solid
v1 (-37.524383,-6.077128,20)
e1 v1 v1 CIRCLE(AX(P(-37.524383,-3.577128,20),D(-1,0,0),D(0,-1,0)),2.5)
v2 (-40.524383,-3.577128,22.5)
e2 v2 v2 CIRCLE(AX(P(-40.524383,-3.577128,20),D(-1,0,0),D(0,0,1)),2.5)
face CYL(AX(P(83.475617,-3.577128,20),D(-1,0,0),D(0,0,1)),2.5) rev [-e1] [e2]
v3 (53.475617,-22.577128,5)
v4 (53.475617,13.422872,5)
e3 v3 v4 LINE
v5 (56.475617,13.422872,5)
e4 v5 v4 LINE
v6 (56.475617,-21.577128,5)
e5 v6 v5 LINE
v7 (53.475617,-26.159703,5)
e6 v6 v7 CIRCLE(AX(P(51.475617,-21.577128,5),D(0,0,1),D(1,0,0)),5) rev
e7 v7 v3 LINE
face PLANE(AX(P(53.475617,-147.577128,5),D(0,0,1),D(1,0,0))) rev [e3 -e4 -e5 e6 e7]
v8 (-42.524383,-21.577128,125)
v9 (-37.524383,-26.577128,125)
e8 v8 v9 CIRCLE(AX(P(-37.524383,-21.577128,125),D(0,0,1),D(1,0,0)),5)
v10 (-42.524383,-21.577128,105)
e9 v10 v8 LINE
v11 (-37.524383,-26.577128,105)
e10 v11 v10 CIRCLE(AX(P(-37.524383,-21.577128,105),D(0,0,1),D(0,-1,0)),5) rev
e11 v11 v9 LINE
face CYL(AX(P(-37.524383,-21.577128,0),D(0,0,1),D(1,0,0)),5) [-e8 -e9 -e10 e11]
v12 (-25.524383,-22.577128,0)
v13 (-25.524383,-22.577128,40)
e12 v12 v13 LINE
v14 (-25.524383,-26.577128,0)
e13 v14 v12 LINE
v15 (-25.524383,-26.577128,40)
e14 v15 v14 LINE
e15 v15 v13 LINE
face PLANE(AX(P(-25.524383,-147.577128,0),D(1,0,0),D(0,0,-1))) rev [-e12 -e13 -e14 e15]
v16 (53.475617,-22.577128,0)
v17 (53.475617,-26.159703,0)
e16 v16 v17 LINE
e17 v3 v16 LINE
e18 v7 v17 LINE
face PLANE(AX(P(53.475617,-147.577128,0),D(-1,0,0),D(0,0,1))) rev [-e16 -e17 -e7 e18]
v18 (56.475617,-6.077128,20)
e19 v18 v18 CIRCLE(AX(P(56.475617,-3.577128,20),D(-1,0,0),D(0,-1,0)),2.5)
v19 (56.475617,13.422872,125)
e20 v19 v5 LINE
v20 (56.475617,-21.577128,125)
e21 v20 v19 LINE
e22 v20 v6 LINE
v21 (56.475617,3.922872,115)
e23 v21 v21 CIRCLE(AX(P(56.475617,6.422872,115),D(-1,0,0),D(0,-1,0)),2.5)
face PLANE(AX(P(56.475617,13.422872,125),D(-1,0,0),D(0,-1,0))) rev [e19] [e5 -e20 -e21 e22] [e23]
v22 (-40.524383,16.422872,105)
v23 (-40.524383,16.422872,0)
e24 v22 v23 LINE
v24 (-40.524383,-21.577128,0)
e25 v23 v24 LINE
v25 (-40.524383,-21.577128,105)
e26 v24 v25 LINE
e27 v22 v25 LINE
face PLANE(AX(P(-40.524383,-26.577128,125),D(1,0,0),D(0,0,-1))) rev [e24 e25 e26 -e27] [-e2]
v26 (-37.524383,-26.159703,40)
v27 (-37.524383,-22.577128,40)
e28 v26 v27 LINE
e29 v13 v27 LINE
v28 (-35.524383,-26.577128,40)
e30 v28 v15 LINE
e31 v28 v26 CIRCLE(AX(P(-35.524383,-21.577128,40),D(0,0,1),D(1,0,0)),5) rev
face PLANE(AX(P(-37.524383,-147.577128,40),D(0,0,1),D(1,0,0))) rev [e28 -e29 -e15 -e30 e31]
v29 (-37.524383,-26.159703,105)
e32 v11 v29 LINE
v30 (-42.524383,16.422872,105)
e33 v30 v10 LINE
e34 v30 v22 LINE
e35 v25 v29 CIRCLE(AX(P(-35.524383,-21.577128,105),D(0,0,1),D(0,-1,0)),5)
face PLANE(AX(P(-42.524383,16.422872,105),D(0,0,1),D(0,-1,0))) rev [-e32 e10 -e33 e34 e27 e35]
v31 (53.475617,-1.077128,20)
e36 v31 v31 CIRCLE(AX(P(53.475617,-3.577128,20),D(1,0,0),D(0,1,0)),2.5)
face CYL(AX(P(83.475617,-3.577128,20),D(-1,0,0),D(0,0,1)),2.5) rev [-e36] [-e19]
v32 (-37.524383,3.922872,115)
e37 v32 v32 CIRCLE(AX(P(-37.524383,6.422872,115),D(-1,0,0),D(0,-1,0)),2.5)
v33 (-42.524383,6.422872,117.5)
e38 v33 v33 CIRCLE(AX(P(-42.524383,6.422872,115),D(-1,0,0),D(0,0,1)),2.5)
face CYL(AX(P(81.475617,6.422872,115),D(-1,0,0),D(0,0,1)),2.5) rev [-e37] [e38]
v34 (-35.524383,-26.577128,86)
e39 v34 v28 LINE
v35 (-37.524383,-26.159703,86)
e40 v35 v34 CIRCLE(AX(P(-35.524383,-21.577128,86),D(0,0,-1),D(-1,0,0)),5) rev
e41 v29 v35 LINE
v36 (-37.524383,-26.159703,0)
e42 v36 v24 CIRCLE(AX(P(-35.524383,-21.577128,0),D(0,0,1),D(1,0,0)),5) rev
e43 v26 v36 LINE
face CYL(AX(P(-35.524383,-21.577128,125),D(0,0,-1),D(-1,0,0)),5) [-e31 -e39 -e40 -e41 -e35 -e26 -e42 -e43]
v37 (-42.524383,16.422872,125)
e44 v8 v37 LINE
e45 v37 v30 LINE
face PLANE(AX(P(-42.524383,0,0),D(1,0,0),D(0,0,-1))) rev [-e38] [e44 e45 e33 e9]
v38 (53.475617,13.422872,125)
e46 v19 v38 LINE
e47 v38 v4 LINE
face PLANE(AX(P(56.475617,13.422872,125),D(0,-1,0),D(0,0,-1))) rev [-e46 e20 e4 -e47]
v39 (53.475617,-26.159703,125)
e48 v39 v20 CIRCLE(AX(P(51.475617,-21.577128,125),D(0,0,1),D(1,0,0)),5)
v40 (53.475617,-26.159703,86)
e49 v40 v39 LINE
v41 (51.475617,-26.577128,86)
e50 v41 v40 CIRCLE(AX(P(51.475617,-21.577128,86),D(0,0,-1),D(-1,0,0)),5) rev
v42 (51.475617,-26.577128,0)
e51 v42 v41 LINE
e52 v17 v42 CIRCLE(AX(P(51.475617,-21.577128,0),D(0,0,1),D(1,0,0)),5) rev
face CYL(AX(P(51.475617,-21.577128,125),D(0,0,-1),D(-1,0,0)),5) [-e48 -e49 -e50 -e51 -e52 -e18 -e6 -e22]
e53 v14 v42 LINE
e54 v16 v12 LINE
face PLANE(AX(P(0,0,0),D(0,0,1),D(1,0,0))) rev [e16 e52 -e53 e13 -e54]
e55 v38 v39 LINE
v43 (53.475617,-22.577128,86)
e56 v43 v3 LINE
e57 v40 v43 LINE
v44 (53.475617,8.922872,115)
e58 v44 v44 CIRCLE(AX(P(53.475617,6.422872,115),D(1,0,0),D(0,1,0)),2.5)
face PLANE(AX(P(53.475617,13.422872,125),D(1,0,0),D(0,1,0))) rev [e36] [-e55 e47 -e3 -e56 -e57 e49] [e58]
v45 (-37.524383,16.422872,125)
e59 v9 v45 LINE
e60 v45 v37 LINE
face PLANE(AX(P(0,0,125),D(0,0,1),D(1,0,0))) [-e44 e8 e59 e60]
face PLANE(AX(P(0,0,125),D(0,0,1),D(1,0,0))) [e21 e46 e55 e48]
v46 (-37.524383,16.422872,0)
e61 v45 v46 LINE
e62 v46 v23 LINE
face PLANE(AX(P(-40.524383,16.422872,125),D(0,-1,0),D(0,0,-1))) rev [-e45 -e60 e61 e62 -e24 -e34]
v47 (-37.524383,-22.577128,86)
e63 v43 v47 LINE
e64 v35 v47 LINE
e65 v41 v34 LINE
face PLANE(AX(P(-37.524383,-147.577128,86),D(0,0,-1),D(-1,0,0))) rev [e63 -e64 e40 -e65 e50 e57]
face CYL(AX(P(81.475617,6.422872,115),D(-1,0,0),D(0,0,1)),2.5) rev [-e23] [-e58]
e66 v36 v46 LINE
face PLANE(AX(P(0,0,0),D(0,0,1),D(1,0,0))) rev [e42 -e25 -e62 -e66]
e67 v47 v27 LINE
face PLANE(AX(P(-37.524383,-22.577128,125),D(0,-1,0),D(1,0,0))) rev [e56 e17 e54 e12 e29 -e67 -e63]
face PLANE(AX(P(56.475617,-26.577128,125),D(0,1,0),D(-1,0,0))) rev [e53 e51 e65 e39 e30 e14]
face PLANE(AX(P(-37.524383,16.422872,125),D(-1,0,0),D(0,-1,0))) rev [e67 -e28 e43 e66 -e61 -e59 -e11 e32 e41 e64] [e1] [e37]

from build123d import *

# Parameters (mm, degrees)
SALIENTE_EXTRUIR1_DEPTH    = 125
CORTAR_EXTRUIR1_DEPTH      = 125
CORTAR_EXTRUIR1_DEPTH_BACK = 125
CROQUIS3_W                 = 4
CROQUIS3_H                 = 5
CROQUIS3_W_2               = 12
CROQUIS3_H_2               = 40
CROQUIS4_W                 = 91
CROQUIS4_H                 = 39
CORTAR_EXTRUIR2_DEPTH      = 125
CROQUIS5_W                 = 20
CROQUIS5_H                 = 43
SALIENTE_EXTRUIR2_DEPTH    = 2
CROQUIS6_R                 = 2.5
CORTAR_EXTRUIR3_DEPTH      = 124
CROQUIS7_R                 = 2.5
CORTAR_EXTRUIR4_DEPTH      = 124
REDONDEO1_R                = 5
REDONDEO2_R                = 5


# Some blends are built 0.0001 mm under size
with BuildPart() as part:
    # Croquis2 → Saliente-Extruir1 (new body)
    with BuildSketch(Plane.XY):
        Polygon((56.475617161, 13.42287234), (56.475617161, -26.57712766), (-40.524382839, -26.57712766), (-40.524382839, 16.42287234), (-37.524382839, 16.42287234), (-37.524382839, -22.57712766), (53.475617161, -22.57712766), (53.475617161, 13.42287234), align=None)
    extrude(amount=SALIENTE_EXTRUIR1_DEPTH)

    # Croquis3 → Cortar-Extruir1 (cut, two sides: drawn at the far end of the back side and taken through both)
    with BuildSketch(Plane(origin=(0, -22.57712766, 0), x_dir=(1, 0, 0), z_dir=(0, 1, 0)).offset(-CORTAR_EXTRUIR1_DEPTH_BACK)):
        with Locations((55.475617161, -2.5)):
            Rectangle(CROQUIS3_W, CROQUIS3_H)
        with Locations((-31.524382839, -20)):
            Rectangle(CROQUIS3_W_2, CROQUIS3_H_2)
    extrude(amount=CORTAR_EXTRUIR1_DEPTH + CORTAR_EXTRUIR1_DEPTH_BACK, mode=Mode.SUBTRACT)

    # Croquis4 → Cortar-Extruir2 (cut)
    with BuildSketch(Plane(origin=(0, -22.57712766, 0), x_dir=(1, 0, 0), z_dir=(0, 1, 0))):
        with Locations((7.975617161, -105.5)):
            Rectangle(CROQUIS4_W, CROQUIS4_H)
    extrude(amount=-CORTAR_EXTRUIR2_DEPTH, mode=Mode.SUBTRACT)

    # Croquis5 → Saliente-Extruir2 (add)
    with BuildSketch(Plane.ZY.offset(40.524382839)):
        with Locations((115, -5.07712766)):
            Rectangle(CROQUIS5_W, CROQUIS5_H)
    extrude(amount=SALIENTE_EXTRUIR2_DEPTH)

    # Croquis6 → Cortar-Extruir3 (cut)
    with BuildSketch(Plane.ZY.offset(40.524382839)):
        with Locations(Location((20, -3.57712766, 0), (0, 0, 270))):
            Circle(CROQUIS6_R)
    extrude(amount=-CORTAR_EXTRUIR3_DEPTH, mode=Mode.SUBTRACT)

    # Croquis7 → Cortar-Extruir4 (cut)
    with BuildSketch(Plane.ZY.offset(42.524382839)):
        with Locations((115, 6.42287234)):
            Circle(CROQUIS7_R)
    extrude(amount=-CORTAR_EXTRUIR4_DEPTH, mode=Mode.SUBTRACT)

    # Redondeo1
    # the kernel refuses this fillet: 5 mm, written as the material it takes off along each edge
    with BuildSketch(Plane(origin=(56.475617161, -26.57712766, -7.5), x_dir=(0, 1, 0), z_dir=(0, 0, 1))) as redondeo1_piece_1:
        with BuildLine():
            CenterArc((REDONDEO1_R, REDONDEO1_R), REDONDEO1_R, 180, 90)
            Line((0, REDONDEO1_R), (0, 0))
            Line((0, 0), (REDONDEO1_R, 0))
        make_face()
    extrude(amount=145, mode=Mode.SUBTRACT)
    with BuildSketch(Plane(origin=(-40.524382839, -26.57712766, -12.5), x_dir=(1, 0, 0), z_dir=(0, 0, 1))) as redondeo1_piece_2:
        with BuildLine():
            CenterArc((REDONDEO1_R, REDONDEO1_R), REDONDEO1_R, 180, 90)
            Line((0, REDONDEO1_R), (0, 0))
            Line((0, 0), (REDONDEO1_R, 0))
        make_face()
    extrude(amount=117.5, mode=Mode.SUBTRACT)

    # Redondeo2
    redondeo2_edges = [part.edges().sort_by_distance(p)[0] for p in [
        (-42.524382839, -26.57712766, 115),
    ]]
    fillet(redondeo2_edges, radius=REDONDEO2_R - 0.0001)  # a hair under: the kernel refuses the full size


solid = part.part
